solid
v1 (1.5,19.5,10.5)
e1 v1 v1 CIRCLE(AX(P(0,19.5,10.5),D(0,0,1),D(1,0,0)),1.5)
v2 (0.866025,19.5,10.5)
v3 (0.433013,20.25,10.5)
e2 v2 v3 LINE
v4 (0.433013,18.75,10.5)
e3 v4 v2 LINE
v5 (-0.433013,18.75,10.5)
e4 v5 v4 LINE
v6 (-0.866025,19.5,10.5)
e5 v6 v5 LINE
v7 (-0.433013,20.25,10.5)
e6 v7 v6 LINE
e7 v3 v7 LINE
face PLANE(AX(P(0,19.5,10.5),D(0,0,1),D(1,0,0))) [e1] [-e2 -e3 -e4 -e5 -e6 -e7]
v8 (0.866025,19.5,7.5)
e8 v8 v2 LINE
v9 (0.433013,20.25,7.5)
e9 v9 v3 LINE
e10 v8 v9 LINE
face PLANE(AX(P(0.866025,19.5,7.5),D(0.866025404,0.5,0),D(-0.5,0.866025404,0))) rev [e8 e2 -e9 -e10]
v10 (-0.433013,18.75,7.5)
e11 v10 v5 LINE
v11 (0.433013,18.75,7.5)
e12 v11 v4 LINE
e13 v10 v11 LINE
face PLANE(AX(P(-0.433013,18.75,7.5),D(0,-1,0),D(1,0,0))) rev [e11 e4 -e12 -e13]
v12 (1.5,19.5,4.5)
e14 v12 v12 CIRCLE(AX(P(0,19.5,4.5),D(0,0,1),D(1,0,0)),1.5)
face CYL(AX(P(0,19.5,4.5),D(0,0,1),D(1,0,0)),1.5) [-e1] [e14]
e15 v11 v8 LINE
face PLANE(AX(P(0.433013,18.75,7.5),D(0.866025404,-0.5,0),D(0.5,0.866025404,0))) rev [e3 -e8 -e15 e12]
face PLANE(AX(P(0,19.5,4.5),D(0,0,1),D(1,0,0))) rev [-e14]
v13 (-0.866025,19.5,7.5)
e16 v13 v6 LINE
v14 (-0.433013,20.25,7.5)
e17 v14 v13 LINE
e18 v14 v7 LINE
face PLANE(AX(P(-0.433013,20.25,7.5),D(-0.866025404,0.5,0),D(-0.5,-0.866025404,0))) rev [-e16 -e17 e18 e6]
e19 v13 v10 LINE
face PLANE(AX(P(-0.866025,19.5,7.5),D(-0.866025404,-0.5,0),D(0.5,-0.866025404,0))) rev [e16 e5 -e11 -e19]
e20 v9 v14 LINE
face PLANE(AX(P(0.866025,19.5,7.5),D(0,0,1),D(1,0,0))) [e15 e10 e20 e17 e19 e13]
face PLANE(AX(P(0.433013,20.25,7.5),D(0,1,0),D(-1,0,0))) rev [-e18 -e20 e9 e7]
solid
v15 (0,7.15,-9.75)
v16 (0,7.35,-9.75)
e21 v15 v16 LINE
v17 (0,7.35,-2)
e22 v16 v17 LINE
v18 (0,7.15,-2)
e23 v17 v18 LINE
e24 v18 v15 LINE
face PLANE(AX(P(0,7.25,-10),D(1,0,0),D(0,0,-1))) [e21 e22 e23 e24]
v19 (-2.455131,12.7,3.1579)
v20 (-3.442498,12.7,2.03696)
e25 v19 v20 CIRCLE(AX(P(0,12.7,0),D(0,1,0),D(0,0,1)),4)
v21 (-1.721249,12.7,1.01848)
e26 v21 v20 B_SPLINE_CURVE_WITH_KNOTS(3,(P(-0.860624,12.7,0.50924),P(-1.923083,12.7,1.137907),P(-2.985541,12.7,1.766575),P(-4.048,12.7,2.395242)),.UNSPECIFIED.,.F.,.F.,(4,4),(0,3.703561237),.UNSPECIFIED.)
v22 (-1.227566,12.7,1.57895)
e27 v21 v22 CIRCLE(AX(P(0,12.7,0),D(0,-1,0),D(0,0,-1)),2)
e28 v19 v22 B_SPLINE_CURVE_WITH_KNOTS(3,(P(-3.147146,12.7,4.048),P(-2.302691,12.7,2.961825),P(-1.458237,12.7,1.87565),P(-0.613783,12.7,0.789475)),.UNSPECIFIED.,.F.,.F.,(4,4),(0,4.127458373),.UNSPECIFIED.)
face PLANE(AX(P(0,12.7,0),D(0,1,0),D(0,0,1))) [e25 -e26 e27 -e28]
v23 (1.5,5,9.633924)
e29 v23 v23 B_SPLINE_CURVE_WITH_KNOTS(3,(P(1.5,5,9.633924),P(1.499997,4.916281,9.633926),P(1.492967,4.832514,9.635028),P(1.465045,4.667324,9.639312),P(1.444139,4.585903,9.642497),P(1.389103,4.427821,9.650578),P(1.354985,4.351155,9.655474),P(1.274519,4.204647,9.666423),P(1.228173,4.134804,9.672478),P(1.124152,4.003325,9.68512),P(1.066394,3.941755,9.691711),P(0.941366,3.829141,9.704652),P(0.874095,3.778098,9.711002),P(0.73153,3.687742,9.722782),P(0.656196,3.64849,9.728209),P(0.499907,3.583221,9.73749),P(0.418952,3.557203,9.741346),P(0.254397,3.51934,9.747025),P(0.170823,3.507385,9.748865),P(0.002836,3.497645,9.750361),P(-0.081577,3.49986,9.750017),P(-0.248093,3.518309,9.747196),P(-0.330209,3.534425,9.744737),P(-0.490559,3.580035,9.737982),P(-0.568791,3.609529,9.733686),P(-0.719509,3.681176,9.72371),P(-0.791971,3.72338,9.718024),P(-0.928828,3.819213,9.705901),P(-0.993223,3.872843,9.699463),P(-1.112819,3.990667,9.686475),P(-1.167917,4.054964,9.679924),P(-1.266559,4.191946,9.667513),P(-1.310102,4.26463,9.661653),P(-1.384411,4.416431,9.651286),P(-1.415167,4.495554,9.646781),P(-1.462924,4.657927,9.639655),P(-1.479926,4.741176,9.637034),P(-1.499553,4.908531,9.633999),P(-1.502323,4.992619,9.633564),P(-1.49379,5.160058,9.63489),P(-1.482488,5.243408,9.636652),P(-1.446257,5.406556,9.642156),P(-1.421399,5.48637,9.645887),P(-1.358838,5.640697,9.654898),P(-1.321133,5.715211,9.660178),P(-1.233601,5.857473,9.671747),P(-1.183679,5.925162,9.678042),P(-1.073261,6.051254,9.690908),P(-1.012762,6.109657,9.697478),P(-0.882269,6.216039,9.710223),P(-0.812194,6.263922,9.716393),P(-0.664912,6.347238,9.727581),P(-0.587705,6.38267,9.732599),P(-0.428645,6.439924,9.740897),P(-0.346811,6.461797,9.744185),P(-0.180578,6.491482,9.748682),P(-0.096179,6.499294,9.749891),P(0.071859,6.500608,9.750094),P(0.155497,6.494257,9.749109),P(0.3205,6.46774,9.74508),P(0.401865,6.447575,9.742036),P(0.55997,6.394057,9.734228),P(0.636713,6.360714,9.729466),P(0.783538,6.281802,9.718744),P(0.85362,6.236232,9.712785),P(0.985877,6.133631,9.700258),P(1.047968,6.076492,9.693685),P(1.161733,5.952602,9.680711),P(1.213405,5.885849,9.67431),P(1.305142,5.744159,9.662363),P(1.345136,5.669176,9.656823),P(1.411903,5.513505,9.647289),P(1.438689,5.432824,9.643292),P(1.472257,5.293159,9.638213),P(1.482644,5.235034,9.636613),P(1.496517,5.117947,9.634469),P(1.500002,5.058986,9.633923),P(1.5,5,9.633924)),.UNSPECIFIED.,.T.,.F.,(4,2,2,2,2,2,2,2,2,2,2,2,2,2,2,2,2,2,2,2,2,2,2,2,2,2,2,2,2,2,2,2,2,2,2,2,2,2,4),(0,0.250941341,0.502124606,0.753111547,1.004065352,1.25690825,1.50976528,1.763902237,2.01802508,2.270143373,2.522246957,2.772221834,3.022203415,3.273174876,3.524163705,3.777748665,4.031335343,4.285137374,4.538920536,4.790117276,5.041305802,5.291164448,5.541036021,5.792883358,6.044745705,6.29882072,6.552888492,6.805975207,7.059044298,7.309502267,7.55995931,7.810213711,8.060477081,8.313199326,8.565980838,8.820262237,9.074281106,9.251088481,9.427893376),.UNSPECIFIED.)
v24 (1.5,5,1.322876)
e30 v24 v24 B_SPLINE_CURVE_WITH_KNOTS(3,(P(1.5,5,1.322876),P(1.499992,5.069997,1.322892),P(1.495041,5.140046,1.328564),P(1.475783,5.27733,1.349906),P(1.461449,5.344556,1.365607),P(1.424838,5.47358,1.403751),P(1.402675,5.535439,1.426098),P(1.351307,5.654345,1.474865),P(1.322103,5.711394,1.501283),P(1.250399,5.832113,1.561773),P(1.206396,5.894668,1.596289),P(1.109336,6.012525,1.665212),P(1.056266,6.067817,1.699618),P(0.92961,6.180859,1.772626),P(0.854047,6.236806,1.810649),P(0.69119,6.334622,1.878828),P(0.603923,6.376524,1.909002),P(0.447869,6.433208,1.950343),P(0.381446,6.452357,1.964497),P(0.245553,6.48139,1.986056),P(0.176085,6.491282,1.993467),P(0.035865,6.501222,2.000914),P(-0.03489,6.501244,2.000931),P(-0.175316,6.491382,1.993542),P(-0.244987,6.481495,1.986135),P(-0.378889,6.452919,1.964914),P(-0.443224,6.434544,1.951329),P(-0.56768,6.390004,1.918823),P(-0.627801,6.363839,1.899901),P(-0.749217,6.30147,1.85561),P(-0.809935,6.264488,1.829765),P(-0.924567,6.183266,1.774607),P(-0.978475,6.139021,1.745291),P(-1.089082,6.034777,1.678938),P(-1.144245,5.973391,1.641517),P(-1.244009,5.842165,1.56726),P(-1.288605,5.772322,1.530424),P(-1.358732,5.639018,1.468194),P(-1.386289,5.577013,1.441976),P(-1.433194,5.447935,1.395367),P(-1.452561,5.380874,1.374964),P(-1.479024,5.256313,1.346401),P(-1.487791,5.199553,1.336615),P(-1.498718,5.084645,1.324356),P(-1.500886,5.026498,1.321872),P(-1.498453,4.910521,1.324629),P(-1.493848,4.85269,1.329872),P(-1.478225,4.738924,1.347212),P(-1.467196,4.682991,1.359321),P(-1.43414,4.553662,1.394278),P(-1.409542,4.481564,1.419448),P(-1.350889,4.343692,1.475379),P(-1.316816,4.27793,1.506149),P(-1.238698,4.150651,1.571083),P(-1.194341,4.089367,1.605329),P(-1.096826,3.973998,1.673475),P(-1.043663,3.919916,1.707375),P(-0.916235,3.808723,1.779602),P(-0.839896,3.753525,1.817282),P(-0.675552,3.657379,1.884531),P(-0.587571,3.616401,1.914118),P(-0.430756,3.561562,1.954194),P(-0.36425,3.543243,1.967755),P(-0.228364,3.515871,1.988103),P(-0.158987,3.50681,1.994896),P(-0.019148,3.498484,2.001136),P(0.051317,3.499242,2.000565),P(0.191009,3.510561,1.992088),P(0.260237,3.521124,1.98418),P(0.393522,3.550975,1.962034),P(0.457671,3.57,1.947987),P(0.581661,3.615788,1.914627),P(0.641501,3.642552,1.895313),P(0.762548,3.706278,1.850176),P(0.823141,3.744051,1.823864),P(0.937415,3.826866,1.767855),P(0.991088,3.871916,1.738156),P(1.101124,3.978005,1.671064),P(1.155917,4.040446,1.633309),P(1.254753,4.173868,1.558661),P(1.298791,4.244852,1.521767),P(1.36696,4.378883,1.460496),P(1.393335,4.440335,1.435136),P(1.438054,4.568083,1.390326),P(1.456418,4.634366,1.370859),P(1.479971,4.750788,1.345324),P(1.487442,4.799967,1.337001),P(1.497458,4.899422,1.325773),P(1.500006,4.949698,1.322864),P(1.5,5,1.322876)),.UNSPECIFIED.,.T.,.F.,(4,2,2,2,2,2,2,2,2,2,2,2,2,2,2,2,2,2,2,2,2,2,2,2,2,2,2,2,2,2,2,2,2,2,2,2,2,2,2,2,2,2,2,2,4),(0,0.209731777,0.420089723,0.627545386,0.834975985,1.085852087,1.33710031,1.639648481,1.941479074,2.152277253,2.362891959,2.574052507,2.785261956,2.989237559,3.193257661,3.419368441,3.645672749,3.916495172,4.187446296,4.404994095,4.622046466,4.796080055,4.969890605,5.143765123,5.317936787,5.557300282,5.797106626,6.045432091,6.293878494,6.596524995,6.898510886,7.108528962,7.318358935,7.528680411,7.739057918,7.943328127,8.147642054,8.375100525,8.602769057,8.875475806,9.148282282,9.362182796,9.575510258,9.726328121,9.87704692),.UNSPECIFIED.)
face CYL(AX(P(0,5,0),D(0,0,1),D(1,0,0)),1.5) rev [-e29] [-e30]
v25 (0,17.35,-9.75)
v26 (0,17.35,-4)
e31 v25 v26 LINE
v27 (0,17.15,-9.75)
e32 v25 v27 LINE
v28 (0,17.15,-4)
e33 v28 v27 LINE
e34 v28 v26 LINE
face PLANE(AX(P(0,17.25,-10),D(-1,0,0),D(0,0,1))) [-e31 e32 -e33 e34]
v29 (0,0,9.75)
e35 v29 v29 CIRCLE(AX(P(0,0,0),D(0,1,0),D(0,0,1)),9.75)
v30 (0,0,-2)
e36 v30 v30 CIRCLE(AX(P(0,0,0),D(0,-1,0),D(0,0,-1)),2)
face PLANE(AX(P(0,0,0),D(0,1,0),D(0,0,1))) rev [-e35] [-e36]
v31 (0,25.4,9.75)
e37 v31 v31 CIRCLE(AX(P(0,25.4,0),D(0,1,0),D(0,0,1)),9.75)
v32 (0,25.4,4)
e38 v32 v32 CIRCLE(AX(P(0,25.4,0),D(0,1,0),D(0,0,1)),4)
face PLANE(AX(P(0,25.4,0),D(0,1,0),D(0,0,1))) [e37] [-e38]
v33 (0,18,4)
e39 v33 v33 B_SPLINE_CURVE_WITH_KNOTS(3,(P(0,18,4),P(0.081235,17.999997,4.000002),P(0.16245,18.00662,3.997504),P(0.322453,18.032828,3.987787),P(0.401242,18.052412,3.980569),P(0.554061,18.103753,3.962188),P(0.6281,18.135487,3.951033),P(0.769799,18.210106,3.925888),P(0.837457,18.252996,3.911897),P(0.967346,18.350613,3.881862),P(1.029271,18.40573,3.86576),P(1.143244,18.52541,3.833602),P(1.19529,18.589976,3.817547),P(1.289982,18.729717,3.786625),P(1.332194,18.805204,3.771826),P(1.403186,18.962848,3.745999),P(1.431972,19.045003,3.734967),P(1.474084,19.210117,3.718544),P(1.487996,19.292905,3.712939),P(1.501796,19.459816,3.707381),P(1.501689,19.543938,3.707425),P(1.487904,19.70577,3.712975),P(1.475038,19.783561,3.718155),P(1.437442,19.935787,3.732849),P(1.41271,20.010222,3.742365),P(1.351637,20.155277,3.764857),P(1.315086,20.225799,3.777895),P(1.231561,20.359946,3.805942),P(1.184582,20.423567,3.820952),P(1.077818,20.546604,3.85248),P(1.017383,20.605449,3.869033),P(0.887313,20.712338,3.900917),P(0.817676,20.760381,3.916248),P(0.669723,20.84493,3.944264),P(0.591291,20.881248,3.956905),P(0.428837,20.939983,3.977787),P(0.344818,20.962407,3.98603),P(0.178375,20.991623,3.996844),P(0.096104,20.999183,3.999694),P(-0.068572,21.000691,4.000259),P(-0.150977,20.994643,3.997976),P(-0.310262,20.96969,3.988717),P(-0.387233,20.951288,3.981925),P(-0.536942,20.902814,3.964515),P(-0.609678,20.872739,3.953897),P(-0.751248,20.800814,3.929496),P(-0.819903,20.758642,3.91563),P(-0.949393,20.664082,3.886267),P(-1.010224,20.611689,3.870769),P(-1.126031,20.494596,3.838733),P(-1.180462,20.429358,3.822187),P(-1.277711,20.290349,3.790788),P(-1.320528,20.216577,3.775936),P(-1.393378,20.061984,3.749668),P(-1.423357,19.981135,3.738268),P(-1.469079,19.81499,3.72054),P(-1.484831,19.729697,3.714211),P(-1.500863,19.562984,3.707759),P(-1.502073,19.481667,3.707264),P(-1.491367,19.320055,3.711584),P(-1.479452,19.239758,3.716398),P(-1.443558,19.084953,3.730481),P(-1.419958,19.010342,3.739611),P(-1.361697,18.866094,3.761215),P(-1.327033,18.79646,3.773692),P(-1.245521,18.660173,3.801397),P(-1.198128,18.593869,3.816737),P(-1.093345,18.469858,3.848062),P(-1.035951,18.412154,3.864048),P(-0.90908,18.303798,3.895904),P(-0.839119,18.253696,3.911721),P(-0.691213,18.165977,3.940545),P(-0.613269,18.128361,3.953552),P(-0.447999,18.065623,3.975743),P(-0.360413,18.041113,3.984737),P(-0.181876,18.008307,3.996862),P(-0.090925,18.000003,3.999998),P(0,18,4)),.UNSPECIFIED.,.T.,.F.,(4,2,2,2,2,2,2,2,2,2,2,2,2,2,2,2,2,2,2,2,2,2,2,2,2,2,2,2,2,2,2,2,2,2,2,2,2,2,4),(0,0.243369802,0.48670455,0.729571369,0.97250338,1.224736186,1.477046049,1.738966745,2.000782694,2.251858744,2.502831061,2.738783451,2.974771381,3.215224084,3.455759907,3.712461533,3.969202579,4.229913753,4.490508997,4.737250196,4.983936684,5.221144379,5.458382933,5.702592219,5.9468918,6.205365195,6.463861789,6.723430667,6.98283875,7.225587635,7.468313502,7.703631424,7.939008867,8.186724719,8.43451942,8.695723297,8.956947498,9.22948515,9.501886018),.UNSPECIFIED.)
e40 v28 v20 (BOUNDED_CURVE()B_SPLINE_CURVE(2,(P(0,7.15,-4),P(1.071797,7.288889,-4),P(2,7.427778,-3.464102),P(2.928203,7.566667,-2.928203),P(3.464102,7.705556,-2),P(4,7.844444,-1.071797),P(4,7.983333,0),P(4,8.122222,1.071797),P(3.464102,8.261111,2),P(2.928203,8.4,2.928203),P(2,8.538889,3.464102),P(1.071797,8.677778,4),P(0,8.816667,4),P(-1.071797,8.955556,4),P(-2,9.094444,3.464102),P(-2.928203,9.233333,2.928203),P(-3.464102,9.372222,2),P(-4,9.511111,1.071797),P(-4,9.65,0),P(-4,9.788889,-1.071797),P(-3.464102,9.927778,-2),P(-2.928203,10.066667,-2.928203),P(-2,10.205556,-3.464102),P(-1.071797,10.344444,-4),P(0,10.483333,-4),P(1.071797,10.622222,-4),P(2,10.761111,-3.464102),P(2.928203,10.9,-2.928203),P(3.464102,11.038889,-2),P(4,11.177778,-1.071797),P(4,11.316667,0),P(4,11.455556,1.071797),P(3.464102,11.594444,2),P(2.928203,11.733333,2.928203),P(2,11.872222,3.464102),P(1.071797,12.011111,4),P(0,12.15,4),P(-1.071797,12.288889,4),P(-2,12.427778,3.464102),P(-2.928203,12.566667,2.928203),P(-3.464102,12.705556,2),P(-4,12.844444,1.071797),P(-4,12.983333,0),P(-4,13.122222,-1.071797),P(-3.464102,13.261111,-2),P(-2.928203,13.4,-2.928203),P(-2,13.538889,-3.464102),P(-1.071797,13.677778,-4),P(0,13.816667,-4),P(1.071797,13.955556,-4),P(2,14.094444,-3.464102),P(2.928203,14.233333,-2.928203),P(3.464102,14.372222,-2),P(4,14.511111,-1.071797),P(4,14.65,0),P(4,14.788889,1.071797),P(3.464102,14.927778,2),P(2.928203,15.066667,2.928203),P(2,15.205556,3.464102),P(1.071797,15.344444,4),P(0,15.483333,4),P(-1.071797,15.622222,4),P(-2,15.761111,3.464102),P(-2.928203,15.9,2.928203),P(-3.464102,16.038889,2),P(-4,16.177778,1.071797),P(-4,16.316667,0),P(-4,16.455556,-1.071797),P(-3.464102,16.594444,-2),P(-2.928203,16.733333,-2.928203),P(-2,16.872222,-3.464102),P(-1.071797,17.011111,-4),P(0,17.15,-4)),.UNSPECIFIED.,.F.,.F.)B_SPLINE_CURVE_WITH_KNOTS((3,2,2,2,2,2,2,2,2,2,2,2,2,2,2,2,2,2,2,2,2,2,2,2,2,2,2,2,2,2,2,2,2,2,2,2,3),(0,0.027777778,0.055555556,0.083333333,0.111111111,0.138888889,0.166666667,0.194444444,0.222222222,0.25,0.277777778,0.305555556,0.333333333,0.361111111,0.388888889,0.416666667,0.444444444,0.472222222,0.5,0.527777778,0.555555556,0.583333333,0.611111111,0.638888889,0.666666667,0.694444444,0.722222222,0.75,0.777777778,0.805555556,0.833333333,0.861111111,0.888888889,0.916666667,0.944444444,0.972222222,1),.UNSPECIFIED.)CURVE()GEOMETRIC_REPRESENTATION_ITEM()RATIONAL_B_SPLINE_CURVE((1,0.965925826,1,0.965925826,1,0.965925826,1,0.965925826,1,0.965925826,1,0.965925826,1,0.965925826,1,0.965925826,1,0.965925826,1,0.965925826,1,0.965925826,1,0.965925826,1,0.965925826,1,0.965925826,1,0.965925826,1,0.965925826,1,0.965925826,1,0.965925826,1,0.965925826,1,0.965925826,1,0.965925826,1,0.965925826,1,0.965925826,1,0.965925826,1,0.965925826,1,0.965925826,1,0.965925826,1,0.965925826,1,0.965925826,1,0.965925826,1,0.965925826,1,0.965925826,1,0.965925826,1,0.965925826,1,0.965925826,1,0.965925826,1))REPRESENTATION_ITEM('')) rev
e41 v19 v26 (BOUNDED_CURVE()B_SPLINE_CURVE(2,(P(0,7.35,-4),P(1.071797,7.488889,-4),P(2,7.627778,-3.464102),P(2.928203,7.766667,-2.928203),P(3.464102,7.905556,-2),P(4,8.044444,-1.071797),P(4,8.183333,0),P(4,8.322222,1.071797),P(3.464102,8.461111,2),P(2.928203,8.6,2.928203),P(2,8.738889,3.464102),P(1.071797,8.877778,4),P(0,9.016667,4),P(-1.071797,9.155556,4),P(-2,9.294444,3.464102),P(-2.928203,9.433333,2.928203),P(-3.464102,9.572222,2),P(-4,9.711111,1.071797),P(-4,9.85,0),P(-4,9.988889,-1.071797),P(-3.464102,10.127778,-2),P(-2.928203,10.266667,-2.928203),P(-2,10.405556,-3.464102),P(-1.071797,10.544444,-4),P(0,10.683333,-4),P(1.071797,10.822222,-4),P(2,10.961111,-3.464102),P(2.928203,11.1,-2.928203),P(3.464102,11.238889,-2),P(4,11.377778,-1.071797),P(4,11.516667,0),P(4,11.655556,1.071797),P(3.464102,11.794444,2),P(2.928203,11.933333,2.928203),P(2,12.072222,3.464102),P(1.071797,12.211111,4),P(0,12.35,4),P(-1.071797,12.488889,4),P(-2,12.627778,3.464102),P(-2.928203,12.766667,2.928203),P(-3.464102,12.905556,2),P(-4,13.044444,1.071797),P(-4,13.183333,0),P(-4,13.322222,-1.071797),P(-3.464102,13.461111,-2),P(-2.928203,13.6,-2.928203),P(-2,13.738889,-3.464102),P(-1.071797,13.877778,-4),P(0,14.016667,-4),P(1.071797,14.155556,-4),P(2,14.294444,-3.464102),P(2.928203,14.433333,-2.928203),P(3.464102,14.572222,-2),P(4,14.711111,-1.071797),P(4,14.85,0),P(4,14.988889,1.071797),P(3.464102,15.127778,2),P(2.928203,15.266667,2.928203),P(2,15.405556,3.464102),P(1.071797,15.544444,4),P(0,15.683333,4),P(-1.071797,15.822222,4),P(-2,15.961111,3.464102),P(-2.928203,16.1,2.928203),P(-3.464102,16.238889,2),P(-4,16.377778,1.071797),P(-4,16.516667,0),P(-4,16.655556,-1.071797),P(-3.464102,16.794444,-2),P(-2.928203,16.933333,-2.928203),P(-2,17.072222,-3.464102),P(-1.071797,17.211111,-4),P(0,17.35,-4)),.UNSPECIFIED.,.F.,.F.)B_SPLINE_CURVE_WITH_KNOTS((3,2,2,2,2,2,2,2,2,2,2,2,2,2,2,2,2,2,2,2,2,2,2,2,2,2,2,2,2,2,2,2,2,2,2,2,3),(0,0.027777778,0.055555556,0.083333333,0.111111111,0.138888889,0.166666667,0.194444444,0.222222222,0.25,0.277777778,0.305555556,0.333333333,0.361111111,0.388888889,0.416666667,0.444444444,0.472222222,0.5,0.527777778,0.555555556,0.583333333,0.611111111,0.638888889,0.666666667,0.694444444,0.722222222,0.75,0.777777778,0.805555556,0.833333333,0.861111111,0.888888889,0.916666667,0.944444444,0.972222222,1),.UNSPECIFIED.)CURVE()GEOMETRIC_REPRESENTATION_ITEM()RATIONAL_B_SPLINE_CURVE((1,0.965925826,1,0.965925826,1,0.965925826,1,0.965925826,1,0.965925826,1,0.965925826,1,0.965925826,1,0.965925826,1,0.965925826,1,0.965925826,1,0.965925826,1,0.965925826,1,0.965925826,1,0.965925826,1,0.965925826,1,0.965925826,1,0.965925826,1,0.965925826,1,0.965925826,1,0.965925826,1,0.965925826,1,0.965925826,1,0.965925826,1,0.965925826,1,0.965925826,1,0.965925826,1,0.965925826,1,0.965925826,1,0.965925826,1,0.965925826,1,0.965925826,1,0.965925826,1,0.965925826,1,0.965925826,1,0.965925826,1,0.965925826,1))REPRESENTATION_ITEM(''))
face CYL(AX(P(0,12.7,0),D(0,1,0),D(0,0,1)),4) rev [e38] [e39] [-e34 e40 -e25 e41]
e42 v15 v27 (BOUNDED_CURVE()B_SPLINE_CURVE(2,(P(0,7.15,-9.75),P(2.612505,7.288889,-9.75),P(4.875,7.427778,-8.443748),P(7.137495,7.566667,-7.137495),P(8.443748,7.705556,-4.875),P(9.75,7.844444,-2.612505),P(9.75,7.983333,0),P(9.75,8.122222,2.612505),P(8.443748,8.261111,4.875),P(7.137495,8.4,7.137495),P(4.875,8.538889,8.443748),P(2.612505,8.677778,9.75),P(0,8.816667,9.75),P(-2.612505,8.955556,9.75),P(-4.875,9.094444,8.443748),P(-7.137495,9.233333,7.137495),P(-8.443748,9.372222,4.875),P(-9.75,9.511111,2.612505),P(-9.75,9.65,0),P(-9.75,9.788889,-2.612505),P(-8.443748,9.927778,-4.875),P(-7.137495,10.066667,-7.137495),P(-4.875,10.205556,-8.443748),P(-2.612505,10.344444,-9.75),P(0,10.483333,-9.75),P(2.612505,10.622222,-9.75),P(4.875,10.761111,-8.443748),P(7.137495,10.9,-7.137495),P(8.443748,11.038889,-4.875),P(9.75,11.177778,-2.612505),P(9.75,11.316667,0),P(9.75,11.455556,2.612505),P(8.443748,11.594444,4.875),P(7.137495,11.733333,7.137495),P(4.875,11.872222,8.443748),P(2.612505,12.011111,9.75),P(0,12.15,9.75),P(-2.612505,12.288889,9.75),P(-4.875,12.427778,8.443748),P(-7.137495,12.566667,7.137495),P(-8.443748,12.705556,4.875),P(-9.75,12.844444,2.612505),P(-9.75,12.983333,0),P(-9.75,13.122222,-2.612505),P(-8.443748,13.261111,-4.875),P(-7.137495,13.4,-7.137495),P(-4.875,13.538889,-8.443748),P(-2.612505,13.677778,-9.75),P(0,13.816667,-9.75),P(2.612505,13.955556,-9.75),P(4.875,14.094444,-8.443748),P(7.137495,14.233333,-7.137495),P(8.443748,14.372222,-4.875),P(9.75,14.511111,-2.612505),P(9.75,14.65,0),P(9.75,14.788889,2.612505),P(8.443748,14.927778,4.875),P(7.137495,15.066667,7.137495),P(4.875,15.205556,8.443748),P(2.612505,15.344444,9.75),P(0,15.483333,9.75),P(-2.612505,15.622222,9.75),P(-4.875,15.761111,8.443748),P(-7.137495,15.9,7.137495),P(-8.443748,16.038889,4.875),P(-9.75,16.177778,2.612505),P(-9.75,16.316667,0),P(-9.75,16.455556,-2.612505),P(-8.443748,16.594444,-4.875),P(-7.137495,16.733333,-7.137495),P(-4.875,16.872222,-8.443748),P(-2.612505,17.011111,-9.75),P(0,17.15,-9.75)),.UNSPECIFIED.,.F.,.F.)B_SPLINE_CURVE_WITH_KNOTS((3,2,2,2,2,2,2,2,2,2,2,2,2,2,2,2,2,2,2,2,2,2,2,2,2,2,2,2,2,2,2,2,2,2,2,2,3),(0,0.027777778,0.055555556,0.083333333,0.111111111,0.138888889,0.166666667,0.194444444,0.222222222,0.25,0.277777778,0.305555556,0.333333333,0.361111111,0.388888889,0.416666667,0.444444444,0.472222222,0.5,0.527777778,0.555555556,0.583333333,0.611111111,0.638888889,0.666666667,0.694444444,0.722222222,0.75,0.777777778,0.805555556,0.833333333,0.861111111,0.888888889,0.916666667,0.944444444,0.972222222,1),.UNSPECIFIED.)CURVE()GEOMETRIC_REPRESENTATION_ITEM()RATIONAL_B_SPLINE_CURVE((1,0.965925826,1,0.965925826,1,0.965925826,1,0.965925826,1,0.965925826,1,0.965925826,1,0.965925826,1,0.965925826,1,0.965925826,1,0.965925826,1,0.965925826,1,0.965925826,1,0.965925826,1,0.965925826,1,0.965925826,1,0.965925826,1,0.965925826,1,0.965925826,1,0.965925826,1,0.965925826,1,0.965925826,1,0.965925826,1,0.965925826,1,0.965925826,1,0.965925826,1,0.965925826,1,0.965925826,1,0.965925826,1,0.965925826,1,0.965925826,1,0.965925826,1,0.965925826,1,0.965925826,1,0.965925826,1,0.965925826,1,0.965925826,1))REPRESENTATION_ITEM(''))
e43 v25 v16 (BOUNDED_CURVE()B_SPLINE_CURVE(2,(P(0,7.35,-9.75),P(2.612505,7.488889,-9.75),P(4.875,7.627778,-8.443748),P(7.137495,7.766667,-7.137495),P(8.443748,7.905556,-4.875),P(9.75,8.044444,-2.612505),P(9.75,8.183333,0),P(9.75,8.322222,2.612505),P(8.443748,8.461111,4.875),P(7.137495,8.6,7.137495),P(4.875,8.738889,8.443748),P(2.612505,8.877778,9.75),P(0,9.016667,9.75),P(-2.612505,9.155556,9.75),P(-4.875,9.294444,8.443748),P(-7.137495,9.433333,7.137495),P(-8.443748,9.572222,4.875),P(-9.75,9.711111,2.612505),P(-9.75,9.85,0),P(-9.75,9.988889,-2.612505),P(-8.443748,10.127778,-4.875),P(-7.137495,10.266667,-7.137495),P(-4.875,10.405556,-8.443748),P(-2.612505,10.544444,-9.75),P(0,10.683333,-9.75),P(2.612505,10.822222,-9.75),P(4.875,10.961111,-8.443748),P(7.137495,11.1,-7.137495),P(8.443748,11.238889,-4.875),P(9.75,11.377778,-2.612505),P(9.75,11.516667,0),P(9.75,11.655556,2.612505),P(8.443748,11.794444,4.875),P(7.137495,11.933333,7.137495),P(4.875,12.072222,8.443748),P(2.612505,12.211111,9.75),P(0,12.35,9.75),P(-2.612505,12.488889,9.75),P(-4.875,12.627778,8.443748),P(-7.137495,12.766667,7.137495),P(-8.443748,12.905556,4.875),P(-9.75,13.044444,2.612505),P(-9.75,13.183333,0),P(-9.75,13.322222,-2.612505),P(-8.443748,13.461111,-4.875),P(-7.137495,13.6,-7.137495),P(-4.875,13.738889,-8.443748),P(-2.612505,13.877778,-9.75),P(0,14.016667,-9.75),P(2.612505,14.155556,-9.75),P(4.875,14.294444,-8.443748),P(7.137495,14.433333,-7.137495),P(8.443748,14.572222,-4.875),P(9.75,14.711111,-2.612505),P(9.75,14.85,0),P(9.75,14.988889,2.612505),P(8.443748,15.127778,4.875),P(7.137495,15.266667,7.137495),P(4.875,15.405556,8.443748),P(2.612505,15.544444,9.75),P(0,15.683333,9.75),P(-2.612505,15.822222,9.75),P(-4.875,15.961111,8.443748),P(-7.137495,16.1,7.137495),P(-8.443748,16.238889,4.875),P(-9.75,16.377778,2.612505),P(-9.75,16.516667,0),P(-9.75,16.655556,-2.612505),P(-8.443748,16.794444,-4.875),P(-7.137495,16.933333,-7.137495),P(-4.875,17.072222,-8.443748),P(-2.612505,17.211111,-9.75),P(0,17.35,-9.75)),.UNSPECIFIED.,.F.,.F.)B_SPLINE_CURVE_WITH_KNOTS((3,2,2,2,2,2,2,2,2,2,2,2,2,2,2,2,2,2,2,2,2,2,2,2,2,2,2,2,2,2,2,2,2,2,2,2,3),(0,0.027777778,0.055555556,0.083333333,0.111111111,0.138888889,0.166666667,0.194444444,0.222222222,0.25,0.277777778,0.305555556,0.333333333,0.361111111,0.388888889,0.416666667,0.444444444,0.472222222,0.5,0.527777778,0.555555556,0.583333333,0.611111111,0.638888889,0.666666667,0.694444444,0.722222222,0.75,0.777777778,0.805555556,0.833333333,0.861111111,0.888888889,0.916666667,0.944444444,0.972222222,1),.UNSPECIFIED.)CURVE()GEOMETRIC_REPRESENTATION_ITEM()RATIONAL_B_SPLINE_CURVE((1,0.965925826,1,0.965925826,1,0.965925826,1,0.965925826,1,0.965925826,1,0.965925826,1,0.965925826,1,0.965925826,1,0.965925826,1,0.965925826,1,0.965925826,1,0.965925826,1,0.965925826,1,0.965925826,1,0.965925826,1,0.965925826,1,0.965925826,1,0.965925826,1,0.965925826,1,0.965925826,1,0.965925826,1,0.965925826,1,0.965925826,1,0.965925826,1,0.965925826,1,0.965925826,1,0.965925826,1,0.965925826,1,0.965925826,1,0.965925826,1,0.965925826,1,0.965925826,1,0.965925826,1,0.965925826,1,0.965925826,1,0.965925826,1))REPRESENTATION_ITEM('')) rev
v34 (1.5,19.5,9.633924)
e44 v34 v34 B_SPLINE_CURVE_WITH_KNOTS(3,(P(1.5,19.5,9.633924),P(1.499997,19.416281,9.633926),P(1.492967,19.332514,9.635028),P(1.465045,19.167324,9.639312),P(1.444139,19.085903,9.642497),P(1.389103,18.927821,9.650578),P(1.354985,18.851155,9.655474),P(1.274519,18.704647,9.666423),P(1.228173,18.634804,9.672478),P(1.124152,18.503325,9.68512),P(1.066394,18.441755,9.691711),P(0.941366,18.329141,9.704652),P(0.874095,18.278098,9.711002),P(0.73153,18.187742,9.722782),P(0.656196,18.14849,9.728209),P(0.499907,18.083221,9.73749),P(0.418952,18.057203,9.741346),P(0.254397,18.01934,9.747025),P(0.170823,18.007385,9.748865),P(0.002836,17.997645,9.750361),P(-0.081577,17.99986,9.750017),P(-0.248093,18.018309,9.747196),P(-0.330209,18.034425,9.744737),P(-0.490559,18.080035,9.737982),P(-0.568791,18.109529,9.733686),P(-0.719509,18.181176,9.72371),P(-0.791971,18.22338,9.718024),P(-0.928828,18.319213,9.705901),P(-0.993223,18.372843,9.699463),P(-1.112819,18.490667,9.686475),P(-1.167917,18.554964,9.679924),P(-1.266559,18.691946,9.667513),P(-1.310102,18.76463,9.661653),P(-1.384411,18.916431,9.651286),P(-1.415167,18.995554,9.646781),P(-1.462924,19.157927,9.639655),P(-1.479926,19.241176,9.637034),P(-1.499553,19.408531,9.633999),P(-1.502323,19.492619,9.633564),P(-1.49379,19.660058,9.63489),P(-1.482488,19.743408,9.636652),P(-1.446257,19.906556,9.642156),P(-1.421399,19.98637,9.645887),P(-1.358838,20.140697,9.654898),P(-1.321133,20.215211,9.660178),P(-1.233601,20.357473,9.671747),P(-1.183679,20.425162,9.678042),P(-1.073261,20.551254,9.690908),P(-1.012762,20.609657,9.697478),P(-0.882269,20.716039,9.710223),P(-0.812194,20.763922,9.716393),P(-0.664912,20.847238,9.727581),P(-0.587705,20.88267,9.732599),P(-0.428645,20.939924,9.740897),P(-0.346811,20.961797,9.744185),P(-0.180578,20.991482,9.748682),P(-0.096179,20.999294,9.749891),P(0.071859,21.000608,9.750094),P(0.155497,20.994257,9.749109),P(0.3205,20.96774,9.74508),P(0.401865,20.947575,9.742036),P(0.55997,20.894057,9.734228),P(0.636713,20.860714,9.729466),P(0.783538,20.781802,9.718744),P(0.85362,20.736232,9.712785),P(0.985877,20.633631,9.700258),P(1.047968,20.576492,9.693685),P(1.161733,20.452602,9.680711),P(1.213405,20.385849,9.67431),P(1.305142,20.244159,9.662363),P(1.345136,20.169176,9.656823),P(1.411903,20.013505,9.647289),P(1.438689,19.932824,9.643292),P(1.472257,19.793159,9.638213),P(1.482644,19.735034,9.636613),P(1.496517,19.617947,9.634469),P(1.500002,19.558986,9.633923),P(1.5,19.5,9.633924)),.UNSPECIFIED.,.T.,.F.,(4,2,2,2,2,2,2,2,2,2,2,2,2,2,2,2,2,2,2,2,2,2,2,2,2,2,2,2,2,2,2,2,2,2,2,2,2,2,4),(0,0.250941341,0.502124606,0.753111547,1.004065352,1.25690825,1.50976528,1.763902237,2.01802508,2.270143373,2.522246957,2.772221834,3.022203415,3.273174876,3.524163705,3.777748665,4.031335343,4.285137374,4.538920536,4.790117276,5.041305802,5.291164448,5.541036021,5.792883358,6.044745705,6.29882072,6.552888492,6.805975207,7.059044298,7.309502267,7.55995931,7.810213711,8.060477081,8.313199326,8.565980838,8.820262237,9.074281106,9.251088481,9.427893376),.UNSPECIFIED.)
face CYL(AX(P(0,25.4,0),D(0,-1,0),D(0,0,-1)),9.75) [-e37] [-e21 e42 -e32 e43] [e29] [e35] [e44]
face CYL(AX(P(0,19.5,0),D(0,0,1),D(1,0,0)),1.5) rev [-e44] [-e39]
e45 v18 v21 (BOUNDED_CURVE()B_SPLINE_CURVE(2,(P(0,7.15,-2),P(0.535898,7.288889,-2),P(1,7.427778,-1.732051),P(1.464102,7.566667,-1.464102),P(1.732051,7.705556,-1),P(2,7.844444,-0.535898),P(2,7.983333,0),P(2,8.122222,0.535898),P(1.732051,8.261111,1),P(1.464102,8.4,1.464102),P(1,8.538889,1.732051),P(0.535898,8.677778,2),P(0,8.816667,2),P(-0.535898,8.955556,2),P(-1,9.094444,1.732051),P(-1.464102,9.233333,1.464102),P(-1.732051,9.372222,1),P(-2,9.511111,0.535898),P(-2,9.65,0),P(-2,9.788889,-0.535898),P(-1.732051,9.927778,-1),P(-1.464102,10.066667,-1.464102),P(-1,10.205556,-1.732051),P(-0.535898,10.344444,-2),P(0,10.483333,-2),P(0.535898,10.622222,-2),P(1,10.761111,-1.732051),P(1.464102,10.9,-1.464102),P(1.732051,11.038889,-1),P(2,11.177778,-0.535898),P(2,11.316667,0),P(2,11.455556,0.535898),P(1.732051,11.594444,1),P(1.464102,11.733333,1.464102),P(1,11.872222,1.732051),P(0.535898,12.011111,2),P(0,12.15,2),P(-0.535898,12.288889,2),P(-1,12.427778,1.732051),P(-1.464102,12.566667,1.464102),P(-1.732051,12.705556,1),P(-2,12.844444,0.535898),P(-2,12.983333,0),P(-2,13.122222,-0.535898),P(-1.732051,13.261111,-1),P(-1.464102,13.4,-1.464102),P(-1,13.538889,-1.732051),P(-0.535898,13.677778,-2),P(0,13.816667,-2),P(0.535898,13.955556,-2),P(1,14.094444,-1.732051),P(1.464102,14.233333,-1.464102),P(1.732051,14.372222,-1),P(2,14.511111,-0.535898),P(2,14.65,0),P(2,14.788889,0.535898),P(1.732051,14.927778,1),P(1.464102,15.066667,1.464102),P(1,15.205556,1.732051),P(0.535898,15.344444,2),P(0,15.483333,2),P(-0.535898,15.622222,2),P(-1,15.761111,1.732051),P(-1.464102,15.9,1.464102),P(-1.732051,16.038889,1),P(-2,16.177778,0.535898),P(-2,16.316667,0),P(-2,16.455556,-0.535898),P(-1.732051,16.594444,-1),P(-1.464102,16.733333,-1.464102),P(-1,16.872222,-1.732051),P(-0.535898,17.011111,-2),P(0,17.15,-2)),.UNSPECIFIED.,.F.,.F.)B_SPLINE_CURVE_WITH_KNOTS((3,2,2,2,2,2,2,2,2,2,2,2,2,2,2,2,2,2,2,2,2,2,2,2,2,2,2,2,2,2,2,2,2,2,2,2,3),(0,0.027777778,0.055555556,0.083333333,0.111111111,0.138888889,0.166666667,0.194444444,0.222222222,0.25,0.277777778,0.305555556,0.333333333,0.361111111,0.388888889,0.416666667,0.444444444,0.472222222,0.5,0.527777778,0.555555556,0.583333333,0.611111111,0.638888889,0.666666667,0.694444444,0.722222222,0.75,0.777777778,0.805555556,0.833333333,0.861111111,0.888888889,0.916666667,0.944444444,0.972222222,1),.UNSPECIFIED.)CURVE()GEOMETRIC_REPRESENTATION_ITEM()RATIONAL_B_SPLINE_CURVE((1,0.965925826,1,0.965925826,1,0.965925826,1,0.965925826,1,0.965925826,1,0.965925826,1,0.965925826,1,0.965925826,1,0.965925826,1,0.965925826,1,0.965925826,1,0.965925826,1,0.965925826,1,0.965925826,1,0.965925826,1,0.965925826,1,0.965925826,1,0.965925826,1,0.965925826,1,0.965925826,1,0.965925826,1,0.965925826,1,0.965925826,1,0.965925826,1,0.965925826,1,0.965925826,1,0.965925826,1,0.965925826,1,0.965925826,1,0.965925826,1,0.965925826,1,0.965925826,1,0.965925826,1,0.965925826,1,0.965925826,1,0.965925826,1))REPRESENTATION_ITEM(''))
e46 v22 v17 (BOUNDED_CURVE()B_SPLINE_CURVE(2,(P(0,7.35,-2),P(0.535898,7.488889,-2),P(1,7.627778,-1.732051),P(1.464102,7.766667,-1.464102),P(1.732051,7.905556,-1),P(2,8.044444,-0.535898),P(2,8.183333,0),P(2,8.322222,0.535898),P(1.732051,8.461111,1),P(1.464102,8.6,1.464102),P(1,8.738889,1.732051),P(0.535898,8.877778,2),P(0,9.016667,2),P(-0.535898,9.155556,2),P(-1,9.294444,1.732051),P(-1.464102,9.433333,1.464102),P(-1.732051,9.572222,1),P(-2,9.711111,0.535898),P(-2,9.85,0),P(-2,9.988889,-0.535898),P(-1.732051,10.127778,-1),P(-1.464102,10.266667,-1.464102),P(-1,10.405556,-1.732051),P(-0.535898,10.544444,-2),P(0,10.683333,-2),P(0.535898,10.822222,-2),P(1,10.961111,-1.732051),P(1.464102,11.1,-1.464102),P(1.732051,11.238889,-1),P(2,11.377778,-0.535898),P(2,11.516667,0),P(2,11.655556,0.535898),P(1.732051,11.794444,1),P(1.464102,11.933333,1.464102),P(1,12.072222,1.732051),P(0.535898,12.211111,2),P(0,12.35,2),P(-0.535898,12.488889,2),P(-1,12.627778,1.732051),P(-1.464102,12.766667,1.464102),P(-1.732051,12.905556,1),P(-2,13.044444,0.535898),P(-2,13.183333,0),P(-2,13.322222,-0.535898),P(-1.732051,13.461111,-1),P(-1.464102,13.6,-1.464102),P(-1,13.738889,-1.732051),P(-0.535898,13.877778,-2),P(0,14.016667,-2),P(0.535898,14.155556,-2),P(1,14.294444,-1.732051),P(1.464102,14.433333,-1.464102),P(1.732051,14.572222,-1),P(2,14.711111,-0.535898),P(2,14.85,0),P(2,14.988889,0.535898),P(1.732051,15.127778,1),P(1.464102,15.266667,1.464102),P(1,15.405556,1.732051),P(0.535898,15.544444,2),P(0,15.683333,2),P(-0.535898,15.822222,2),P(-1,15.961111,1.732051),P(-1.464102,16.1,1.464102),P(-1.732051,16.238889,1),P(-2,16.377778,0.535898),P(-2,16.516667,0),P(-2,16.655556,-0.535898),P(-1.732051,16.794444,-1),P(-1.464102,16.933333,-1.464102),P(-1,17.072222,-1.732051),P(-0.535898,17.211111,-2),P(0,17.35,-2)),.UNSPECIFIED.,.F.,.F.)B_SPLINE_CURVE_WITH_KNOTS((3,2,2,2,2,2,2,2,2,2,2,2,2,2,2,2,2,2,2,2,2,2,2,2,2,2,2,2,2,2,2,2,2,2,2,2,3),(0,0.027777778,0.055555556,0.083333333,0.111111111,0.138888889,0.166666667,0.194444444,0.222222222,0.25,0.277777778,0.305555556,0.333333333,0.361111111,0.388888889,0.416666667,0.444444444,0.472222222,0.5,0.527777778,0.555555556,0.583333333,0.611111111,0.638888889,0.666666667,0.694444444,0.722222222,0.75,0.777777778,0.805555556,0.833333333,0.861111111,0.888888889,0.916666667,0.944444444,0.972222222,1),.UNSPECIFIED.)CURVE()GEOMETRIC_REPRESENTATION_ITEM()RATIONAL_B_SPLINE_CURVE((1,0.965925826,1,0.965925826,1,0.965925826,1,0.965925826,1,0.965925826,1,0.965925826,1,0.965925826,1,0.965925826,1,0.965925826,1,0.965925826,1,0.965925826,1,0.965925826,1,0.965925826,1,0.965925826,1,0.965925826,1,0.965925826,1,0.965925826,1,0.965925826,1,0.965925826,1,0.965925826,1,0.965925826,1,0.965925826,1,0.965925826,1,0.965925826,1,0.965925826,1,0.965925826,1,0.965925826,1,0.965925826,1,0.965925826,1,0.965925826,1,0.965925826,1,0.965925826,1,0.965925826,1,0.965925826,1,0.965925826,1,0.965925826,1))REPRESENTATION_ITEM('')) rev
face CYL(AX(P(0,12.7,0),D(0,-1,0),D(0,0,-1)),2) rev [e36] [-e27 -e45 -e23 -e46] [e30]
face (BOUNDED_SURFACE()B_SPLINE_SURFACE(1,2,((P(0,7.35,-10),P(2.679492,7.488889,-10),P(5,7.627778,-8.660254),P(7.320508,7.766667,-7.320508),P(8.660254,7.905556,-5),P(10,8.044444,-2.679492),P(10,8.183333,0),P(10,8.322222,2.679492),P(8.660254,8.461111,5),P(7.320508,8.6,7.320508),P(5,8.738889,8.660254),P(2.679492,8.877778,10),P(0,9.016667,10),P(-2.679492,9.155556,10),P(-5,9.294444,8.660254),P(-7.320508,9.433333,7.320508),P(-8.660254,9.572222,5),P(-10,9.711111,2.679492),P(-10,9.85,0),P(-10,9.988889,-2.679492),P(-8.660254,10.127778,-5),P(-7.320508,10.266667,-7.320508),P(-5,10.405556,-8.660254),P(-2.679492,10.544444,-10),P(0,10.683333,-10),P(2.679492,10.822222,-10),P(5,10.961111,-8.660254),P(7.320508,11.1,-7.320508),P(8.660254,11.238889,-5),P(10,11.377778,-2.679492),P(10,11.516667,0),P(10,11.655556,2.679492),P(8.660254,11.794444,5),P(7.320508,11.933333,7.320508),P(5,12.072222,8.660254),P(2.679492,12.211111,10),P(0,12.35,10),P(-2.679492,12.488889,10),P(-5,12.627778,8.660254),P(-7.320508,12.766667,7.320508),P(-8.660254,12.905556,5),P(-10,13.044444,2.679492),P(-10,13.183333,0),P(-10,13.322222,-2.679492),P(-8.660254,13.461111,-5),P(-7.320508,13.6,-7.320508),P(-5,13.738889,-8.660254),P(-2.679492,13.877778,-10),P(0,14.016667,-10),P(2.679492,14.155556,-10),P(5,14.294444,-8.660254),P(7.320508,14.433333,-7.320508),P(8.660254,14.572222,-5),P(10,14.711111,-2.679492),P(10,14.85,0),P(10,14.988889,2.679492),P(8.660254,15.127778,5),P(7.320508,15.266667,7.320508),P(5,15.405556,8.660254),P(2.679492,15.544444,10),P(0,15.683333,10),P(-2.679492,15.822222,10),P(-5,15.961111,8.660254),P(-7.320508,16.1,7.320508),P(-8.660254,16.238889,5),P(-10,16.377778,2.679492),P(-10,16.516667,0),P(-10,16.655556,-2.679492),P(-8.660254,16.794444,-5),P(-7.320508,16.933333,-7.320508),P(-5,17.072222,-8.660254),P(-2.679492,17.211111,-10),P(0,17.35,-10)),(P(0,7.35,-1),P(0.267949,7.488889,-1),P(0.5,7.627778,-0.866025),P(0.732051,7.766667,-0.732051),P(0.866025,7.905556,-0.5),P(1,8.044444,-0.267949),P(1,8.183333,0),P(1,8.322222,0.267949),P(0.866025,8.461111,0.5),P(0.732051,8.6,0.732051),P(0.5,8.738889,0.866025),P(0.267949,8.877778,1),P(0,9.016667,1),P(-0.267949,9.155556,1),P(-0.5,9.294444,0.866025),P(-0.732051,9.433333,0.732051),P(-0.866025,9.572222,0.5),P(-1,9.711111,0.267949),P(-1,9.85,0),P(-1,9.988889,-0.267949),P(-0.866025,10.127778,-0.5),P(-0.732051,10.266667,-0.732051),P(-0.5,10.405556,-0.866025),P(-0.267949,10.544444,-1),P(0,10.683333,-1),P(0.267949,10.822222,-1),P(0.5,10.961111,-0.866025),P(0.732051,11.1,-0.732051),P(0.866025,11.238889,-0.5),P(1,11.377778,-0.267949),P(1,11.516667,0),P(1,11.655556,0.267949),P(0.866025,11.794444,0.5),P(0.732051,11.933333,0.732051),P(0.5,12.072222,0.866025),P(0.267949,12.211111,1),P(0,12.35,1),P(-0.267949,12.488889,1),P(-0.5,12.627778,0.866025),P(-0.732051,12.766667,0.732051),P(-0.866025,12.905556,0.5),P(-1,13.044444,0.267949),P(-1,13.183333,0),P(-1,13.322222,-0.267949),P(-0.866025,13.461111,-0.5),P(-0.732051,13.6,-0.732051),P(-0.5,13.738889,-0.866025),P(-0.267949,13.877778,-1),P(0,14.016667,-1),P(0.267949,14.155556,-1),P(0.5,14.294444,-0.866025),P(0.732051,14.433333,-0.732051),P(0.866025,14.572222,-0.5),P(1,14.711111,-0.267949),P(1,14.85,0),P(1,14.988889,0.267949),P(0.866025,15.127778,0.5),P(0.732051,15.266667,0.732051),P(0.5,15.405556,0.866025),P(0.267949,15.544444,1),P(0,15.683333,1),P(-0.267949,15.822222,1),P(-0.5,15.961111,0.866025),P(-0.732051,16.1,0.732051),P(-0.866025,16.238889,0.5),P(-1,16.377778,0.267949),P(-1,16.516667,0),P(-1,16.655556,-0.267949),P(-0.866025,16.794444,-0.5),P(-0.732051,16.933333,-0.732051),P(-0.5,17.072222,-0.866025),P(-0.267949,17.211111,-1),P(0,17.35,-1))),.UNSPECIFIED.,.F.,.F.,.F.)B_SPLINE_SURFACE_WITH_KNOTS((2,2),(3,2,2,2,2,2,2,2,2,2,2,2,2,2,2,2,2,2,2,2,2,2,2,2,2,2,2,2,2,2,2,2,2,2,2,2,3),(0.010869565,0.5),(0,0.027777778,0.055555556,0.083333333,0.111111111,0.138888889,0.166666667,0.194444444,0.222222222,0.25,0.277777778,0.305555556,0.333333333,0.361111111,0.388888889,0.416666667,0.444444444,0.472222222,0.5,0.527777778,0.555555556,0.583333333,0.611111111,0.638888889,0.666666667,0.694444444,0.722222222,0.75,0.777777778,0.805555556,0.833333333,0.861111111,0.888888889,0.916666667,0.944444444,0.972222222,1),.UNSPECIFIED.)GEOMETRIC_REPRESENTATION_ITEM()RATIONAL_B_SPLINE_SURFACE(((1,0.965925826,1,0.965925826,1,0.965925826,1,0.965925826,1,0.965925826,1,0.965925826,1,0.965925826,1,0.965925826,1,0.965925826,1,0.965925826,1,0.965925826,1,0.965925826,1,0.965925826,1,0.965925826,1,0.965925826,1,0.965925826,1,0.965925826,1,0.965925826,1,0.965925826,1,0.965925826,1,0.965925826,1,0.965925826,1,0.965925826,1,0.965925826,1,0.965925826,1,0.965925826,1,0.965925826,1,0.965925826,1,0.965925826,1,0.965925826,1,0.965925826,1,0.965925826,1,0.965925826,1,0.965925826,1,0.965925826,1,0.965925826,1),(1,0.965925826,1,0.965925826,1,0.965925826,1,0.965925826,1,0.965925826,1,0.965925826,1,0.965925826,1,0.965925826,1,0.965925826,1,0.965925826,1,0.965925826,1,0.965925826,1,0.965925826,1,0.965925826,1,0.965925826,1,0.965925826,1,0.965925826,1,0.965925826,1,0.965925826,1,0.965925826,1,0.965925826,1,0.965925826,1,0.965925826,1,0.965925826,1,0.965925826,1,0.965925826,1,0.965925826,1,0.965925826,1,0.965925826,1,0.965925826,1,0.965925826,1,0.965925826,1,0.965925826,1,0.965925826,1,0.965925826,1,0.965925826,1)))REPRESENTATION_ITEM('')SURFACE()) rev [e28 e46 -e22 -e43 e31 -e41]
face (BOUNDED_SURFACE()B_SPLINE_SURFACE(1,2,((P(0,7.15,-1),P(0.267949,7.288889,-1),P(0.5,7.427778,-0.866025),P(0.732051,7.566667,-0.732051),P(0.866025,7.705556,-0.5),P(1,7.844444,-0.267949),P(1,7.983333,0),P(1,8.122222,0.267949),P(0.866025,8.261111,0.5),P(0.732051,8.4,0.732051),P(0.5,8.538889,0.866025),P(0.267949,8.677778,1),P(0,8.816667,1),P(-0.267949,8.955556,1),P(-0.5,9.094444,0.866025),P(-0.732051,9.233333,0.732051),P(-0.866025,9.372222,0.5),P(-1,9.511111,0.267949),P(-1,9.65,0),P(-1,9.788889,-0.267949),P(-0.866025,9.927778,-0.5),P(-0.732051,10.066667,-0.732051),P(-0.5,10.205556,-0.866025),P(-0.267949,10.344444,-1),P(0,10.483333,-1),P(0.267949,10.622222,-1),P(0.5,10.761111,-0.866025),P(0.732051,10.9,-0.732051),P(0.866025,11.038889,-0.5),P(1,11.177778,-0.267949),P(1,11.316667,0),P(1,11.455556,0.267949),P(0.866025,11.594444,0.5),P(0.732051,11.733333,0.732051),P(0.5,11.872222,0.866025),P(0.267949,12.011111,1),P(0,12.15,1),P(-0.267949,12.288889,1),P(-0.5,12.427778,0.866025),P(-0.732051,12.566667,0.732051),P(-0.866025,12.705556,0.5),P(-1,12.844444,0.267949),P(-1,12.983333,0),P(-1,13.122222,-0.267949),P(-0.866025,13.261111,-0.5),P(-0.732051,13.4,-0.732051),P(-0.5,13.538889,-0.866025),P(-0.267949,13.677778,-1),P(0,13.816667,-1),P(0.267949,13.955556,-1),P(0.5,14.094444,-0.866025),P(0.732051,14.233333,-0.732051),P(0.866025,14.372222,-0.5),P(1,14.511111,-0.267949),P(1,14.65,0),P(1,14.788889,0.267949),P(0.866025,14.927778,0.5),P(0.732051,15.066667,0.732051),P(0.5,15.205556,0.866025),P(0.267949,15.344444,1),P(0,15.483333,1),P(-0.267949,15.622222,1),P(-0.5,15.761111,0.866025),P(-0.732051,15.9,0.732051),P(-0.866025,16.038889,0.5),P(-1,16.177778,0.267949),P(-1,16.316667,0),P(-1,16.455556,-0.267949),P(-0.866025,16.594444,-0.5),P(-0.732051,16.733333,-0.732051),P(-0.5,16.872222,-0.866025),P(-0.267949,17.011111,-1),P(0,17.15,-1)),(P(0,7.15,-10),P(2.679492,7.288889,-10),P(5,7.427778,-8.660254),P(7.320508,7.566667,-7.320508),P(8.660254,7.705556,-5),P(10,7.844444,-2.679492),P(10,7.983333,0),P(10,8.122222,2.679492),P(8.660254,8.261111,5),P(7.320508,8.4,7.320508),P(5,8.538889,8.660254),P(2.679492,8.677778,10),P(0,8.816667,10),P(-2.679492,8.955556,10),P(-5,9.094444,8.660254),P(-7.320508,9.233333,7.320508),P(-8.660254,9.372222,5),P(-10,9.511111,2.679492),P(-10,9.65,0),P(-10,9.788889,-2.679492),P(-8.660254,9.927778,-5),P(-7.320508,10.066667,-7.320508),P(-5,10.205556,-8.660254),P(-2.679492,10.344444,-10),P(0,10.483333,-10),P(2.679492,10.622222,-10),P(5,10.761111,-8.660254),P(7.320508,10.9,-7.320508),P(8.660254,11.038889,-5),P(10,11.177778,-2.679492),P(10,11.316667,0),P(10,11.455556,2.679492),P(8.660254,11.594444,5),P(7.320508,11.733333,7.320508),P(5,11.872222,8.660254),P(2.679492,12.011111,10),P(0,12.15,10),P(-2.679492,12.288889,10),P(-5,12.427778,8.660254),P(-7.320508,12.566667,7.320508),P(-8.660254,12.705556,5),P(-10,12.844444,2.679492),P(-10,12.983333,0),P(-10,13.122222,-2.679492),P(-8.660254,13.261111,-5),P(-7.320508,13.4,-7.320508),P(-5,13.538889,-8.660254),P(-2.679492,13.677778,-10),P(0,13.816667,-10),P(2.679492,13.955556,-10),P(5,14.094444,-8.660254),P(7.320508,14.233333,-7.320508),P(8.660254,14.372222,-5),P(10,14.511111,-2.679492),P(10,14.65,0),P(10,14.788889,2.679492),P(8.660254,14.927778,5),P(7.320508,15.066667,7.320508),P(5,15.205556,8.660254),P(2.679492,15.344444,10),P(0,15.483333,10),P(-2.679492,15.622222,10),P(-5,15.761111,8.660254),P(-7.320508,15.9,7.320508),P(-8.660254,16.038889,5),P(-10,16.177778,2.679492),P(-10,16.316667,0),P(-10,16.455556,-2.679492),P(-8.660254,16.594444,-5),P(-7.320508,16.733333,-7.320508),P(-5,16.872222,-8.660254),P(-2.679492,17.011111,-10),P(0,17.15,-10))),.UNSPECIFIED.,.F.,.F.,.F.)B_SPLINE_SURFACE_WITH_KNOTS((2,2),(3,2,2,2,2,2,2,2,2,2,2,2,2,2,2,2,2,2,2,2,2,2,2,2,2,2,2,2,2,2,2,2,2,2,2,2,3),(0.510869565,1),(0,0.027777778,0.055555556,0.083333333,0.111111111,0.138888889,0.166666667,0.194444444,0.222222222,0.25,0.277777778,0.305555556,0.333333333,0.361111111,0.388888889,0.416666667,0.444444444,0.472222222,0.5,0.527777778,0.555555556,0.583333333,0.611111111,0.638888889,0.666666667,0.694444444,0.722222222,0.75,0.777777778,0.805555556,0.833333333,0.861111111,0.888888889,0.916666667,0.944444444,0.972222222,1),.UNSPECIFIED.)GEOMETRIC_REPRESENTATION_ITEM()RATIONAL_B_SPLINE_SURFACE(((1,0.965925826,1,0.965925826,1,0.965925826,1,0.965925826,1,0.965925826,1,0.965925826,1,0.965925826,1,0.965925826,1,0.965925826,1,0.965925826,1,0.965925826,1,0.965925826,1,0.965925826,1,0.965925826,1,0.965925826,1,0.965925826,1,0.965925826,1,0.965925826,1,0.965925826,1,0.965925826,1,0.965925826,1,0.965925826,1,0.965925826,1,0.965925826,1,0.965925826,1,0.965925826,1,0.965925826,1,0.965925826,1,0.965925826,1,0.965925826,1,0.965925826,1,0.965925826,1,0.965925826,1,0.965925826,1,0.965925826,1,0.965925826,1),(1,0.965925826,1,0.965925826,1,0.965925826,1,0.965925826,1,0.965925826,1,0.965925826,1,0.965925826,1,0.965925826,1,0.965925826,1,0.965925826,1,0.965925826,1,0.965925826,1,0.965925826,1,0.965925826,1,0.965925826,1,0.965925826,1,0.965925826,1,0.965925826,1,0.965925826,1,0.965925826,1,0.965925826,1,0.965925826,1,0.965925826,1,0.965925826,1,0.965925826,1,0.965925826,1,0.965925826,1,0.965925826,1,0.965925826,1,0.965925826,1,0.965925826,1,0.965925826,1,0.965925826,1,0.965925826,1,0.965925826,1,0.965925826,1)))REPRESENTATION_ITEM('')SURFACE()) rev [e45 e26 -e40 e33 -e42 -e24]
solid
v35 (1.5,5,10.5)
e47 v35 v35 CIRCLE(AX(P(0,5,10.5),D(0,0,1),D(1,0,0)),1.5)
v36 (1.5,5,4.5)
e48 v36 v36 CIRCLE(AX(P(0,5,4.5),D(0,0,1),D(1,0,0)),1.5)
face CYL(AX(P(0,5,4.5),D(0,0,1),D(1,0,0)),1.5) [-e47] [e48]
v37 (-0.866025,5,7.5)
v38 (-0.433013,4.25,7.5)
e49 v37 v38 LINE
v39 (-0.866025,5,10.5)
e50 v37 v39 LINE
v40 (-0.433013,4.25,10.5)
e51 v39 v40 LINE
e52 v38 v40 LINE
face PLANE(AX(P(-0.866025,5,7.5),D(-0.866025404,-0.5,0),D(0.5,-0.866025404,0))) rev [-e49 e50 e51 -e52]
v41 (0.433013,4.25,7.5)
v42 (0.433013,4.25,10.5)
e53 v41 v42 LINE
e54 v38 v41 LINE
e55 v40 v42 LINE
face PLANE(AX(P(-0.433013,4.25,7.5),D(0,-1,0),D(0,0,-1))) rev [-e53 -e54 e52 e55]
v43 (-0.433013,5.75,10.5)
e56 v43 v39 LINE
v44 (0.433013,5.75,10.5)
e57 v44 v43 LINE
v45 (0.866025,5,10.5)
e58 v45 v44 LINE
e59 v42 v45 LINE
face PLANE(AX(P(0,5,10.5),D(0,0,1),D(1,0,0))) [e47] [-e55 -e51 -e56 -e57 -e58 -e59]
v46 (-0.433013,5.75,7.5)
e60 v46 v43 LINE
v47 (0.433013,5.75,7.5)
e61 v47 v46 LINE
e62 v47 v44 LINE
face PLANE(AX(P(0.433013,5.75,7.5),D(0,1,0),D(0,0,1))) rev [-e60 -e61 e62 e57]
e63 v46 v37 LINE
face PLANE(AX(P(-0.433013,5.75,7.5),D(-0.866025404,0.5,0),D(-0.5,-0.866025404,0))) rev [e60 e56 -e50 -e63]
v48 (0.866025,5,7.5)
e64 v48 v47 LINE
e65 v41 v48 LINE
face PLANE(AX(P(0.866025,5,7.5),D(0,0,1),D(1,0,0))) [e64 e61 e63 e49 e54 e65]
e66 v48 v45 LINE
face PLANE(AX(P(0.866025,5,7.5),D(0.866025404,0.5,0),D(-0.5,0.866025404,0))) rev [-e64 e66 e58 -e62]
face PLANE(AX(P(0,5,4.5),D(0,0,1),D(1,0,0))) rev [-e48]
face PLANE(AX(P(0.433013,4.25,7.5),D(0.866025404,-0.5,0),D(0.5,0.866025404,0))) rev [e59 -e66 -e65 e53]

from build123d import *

# Parameters (mm, degrees)
SKETCH1_R             = 9.75
EXTRUDE1_DEPTH        = 25.4
SKETCH2_R             = 4
EXTRUDE2_DEPTH        = 12.7
SKETCH3_R             = 2
EXTRUDE3_DEPTH        = 12.7
SKETCH4_R             = 1.5
EXTRUDE5_DEPTH        = 9.75
CUT_SWEEP8_PITCH      = 3.333333333
EXTRUDE6_DEPTH        = 3
EXTRUDE6_DEPTH_BACK   = 3
SKETCH11_R            = 1.5
EXTRUDE6_2_DEPTH      = 3
EXTRUDE6_2_DEPTH_BACK = 3
EXTRUDE7_DEPTH        = 3


with BuildPart() as part:
    # Sketch1 → Extrude1 (new body)
    with BuildSketch(Plane(origin=(0, 0, 0), x_dir=(1, 0, 0), z_dir=(0, 1, 0))):
        with Locations(Location((0, 0, 0), (0, 0, 270))):
            Circle(SKETCH1_R)
    extrude(amount=EXTRUDE1_DEPTH)

    # Sketch2 → Extrude2 (cut)
    with BuildSketch(Plane(origin=(0, 25.4, 0), x_dir=(-1, 0, 0), z_dir=(0, 1, 0))):
        with Locations(Location((0, 0, 0), (0, 0, 90))):
            Circle(SKETCH2_R)
    extrude(amount=-EXTRUDE2_DEPTH, mode=Mode.SUBTRACT)

    # Sketch3 → Extrude3 (cut)
    with BuildSketch(Plane.XZ):
        with Locations(Location((0, 0, 0), (0, 0, 270))):
            Circle(SKETCH3_R)
    extrude(amount=-EXTRUDE3_DEPTH, mode=Mode.SUBTRACT)

    # Sketch4 → Extrude5 (cut)
    with BuildSketch(Plane.XY.offset(9.75)):
        with Locations(Location((0, 19.5, 0), (0, 0, 270))):
            Circle(SKETCH4_R)
        with Locations((0, 5)):
            Circle(SKETCH4_R)
    extrude(amount=-EXTRUDE5_DEPTH, mode=Mode.SUBTRACT)

    # Cut-Sweep8: the profile of Sketch10 screwed along a left-hand helix of 3 turns, 12 arcs to a turn; built about Z, then put on its axis
    cut_sweep8_z = Axis((0, 0, 0), (0, 0, 1))
    cut_sweep8_corners = [(10, 0, -0.15), (1, 0, -0.15), (1, 0, -0.35), (10, 0, -0.35)]
    with BuildLine(mode=Mode.PRIVATE) as cut_sweep8_profile:
        Line(cut_sweep8_corners[0], cut_sweep8_corners[1])
        Line(cut_sweep8_corners[1], cut_sweep8_corners[2])
        Line(cut_sweep8_corners[2], cut_sweep8_corners[3])
        Line(cut_sweep8_corners[3], cut_sweep8_corners[0])
    cut_sweep8_cap = Face(cut_sweep8_profile.wire())
    cut_sweep8_turn_angles = [0, -15, -30, -45, -60, -75, -90, -105, -120, -135, -150, -165, -180, -195, -210, -225, -240, -255, -270, -285, -300, -315, -330, -345, -360]
    cut_sweep8_turn_weights = [1, 0.9659258262890683, 1, 0.9659258262890683, 1, 0.9659258262890683, 1, 0.9659258262890683, 1, 0.9659258262890683, 1, 0.9659258262890683, 1, 0.9659258262890683, 1, 0.9659258262890683, 1, 0.9659258262890683, 1, 0.9659258262890683, 1, 0.9659258262890683, 1, 0.9659258262890683, 1]
    cut_sweep8_turn_rails = [Edge.make_bspline([Vector(p[0], p[1], 0).rotate(cut_sweep8_z, cut_sweep8_turn_angles[k]) / cut_sweep8_turn_weights[k] + Vector(0, 0, p[2] + -CUT_SWEEP8_PITCH * cut_sweep8_turn_angles[k] / 360) for k in range(25)], [0, 0, 0, 1, 1, 2, 2, 3, 3, 4, 4, 5, 5, 6, 6, 7, 7, 8, 8, 9, 9, 10, 10, 11, 11, 12, 12, 12], 2, cut_sweep8_turn_weights) for p in cut_sweep8_corners]
    cut_sweep8_turn_sides = [Face.make_surface_from_curves(cut_sweep8_turn_rails[p[0]], cut_sweep8_turn_rails[p[1]]) for p in [(0, 1), (1, 2), (2, 3), (3, 0)]]
    cut_sweep8 = Plane(origin=(0, 7.5, 0), x_dir=(0, 0, -1), z_dir=(0, 1, 0)) * Solid(Shell([*[p.moved(Location((0, 0, CUT_SWEEP8_PITCH * i))) for i in range(3) for p in cut_sweep8_turn_sides], cut_sweep8_cap, cut_sweep8_cap.rotate(cut_sweep8_z, -1080).moved(Location((0, 0, -CUT_SWEEP8_PITCH * -1080 / 360)))]))
    add(cut_sweep8, mode=Mode.SUBTRACT)


with BuildPart() as body_2:
    # Sketch11 → Extrude6 (new, two sides: drawn at the far end of the back side and taken through both)
    with BuildSketch(Plane.XY.offset(7.5).offset(-EXTRUDE6_DEPTH_BACK)):
        with Locations((0, 19.5)):
            Circle(SKETCH11_R)
    extrude(amount=EXTRUDE6_DEPTH + EXTRUDE6_DEPTH_BACK)


with BuildPart() as body_3:
    # Sketch11 → Extrude6 2 (new, two sides: drawn at the far end of the back side and taken through both)
    with BuildSketch(Plane.XY.offset(7.5).offset(-EXTRUDE6_2_DEPTH_BACK)):
        with Locations((0, 5)):
            Circle(SKETCH11_R)
    extrude(amount=EXTRUDE6_2_DEPTH + EXTRUDE6_2_DEPTH_BACK)


with BuildPart() as extrude7_tool:
    # Sketch12 → Extrude7 (new body)
    with BuildSketch(Plane.XY.offset(10.5)):
        Polygon((0.866025404, 5), (0.433012702, 5.75), (-0.433012702, 5.75), (-0.866025404, 5), (-0.433012702, 4.25), (0.433012702, 4.25), align=None)
        Polygon((0.866025404, 19.5), (0.433012702, 20.25), (-0.433012702, 20.25), (-0.866025404, 19.5), (-0.433012702, 18.75), (0.433012702, 18.75), align=None)
    extrude(amount=-EXTRUDE7_DEPTH)


with BuildPart() as body_2_1:
    add(body_2.part)

    # Extrude7: cut by extrude7_tool
    add(extrude7_tool.part, mode=Mode.SUBTRACT)


with BuildPart() as body_3_1:
    add(body_3.part)

    # Extrude7: cut by extrude7_tool
    add(extrude7_tool.part, mode=Mode.SUBTRACT)


solid = Compound([part.part, body_2_1.part, body_3_1.part])
